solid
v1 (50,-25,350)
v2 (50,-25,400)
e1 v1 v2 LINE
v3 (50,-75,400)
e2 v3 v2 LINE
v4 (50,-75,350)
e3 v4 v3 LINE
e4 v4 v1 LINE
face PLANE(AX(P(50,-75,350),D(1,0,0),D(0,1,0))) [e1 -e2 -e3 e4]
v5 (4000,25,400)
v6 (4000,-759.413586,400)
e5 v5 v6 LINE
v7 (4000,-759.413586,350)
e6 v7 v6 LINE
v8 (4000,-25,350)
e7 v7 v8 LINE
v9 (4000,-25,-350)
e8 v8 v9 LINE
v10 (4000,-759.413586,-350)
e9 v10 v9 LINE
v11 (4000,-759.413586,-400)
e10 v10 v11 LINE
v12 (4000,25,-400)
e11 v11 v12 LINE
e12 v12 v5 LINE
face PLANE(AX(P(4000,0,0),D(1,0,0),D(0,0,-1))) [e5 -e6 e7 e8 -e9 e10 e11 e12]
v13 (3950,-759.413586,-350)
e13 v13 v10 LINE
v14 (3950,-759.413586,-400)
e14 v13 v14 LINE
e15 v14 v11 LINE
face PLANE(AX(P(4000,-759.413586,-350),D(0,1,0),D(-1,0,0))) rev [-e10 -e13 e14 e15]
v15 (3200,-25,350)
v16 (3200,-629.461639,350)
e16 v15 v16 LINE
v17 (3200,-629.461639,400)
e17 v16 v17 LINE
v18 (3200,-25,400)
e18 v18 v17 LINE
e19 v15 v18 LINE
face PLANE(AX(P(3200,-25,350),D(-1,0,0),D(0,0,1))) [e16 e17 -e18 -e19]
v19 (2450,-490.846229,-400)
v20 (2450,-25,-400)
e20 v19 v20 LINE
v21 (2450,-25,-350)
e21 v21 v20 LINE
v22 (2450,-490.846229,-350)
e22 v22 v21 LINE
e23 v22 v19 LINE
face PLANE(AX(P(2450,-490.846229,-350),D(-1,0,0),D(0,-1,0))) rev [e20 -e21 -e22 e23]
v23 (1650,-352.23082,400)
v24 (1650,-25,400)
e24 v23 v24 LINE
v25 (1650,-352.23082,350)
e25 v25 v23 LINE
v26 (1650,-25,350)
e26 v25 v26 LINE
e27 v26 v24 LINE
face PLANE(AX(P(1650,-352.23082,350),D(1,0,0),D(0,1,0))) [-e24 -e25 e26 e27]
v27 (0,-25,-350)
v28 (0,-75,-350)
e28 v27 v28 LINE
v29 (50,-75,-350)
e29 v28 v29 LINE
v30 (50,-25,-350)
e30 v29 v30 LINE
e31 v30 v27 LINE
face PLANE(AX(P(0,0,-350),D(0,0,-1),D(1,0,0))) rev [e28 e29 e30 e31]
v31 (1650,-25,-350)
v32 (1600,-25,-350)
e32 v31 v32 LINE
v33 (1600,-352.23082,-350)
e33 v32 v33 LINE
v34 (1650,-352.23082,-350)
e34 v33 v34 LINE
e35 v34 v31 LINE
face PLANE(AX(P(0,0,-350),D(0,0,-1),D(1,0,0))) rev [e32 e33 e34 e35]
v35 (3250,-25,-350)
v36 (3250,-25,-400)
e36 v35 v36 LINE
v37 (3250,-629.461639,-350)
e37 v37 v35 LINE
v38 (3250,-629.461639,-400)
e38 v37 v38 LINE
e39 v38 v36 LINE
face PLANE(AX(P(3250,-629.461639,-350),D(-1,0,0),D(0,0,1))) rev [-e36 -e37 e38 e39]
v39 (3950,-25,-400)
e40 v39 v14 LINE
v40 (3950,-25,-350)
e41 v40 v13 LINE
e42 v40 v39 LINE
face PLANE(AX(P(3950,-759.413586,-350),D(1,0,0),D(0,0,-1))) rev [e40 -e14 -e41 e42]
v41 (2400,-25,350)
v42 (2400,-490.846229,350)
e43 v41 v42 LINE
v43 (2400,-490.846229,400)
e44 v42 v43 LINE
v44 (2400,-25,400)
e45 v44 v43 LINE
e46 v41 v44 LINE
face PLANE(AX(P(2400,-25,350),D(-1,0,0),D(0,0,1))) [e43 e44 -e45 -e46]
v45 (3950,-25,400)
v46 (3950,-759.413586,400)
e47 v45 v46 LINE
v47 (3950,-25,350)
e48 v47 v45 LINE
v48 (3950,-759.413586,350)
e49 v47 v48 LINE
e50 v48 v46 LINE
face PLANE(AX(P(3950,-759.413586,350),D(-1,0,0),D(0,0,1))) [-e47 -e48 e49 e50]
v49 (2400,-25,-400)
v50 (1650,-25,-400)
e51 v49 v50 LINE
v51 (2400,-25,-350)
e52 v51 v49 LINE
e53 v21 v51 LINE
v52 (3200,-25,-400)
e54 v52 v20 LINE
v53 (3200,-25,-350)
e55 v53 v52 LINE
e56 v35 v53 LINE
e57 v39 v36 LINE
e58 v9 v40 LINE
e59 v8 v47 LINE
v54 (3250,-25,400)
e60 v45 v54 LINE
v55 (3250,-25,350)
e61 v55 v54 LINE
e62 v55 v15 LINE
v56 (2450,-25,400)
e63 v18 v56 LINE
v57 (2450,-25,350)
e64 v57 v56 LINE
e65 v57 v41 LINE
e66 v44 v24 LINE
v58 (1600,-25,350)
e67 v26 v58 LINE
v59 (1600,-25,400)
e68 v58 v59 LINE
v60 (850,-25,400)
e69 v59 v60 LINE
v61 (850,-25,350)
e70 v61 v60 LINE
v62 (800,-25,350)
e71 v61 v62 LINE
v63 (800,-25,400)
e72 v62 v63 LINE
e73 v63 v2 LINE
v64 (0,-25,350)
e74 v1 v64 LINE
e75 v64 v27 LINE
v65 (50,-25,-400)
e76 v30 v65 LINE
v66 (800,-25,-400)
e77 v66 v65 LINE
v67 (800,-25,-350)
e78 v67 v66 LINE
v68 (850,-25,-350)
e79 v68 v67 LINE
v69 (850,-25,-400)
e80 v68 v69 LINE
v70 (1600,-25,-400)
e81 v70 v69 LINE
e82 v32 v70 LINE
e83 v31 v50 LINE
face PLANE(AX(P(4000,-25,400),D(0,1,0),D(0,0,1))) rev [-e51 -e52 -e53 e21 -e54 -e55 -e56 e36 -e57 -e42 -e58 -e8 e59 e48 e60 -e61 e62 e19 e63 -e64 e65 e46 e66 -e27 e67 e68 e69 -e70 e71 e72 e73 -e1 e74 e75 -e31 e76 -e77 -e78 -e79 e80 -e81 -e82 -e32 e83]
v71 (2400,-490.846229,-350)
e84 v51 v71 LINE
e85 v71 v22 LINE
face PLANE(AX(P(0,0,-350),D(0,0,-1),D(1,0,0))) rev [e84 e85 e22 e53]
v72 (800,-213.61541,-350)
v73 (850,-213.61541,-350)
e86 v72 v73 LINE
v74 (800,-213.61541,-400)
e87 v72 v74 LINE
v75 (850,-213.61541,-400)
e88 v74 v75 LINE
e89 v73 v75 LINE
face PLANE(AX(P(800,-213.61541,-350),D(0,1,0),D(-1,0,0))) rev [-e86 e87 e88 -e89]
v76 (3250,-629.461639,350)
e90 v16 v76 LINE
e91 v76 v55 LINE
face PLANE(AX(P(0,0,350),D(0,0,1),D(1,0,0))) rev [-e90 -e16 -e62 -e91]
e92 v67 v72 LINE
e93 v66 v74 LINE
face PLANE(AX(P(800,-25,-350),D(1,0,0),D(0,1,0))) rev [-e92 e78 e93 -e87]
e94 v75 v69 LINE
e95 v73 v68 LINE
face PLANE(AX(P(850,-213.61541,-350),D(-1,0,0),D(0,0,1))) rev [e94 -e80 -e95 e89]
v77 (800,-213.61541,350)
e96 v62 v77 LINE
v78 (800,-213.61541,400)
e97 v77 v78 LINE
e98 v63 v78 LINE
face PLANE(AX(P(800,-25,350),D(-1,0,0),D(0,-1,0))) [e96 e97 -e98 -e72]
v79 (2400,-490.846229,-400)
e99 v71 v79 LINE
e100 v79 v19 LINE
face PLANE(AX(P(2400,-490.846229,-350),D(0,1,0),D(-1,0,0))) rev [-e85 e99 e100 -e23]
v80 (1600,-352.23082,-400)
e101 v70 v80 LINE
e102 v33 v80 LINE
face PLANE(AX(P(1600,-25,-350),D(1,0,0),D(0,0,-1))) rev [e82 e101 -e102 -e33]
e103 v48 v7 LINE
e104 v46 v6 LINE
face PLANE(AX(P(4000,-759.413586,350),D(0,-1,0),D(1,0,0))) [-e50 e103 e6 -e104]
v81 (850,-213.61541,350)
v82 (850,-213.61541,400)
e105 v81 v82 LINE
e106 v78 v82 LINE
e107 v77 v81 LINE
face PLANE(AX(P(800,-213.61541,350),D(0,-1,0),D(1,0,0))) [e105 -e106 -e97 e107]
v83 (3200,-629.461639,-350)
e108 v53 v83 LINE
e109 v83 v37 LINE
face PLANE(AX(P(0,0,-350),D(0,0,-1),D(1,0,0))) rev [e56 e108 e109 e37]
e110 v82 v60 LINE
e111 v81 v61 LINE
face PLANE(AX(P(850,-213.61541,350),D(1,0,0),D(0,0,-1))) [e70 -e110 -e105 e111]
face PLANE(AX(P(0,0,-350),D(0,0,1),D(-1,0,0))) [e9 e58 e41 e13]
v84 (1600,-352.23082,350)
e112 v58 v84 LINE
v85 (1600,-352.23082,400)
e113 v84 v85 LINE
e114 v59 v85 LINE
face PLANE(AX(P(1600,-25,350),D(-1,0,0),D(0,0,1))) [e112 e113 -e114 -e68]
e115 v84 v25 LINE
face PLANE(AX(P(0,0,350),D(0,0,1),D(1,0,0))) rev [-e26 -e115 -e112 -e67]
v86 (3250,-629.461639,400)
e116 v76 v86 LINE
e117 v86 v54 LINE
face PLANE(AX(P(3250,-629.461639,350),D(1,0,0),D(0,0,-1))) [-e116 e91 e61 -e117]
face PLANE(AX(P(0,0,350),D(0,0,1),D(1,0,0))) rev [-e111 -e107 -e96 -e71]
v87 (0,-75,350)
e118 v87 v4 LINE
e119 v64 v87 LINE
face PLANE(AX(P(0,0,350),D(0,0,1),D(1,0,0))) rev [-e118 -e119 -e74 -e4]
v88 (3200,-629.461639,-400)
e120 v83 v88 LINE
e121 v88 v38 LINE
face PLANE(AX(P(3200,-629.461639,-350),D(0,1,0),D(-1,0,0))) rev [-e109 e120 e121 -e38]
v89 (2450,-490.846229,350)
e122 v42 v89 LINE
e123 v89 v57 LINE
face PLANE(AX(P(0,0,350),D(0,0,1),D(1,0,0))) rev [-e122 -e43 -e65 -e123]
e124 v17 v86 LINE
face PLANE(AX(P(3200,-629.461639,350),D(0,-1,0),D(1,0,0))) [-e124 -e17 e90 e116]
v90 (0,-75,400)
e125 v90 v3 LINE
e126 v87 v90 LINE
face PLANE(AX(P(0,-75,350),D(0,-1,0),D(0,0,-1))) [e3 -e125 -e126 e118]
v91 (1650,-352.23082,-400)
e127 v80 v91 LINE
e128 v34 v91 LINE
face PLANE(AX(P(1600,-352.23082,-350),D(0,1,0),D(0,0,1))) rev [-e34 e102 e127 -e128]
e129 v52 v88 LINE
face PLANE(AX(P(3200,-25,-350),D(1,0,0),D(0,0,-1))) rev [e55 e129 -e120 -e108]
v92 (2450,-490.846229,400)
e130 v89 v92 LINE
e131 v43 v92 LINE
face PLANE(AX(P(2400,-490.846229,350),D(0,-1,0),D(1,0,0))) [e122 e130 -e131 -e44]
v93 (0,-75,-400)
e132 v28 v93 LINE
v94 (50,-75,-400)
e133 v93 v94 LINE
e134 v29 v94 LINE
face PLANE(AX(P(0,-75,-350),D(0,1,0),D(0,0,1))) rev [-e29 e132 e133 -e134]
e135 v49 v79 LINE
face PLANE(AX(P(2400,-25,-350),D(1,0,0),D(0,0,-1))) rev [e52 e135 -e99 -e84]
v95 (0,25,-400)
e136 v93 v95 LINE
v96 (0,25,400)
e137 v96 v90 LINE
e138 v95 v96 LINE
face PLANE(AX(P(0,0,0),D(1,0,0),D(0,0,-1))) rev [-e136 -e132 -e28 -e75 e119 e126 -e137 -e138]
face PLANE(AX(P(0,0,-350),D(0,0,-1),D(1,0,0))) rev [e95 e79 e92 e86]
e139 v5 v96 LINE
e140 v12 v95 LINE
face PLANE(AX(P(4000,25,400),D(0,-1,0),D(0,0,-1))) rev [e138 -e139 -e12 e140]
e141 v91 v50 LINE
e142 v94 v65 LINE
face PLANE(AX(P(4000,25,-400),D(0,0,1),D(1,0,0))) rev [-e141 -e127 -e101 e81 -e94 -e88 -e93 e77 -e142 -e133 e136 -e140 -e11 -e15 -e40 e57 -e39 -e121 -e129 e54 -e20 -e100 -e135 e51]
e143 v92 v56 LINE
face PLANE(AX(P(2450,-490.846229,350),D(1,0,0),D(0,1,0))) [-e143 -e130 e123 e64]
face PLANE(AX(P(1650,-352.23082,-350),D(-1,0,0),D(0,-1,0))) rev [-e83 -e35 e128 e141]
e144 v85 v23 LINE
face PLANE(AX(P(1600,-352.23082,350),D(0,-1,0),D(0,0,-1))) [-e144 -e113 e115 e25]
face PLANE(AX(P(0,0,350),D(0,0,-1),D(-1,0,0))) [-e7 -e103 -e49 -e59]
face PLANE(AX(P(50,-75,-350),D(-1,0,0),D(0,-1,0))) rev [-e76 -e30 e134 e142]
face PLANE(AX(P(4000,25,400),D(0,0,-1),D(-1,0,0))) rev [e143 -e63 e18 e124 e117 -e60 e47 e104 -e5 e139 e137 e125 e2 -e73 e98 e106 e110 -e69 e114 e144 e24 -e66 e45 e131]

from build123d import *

# Parameters (mm, degrees)
ESBO_O1_W                      = 800
ESBO_O1_H                      = 50
RESSALTO_EXTRUS_O1_DEPTH       = 4000
RESSALTO_EXTRUS_O2_START       = 350
RESSALTO_EXTRUS_O2_OUTLINE_W   = 50
RESSALTO_EXTRUS_O2_OUTLINE_H   = 734.413585936
RESSALTO_EXTRUS_O2_OUTLINE_H_2 = 50
RESSALTO_EXTRUS_O2_OUTLINE_H_3 = 188.61540981
RESSALTO_EXTRUS_O2_OUTLINE_H_4 = 327.23081962
RESSALTO_EXTRUS_O2_OUTLINE_H_5 = 465.84622943
RESSALTO_EXTRUS_O2_OUTLINE_H_6 = 604.461639239
RESSALTO_EXTRUS_O2_DEPTH       = 50


# Read off the part's stored shape, not the designer's step: Ressalto-extrusão2
with BuildPart() as part:
    # Esboço1 → Ressalto-extrusão1 (new body)
    with BuildSketch(Plane(origin=(0, 0, 0), x_dir=(0, 0, -1), z_dir=(1, 0, 0))):
        Rectangle(ESBO_O1_W, ESBO_O1_H)
    extrude(amount=RESSALTO_EXTRUS_O1_DEPTH)

    # Ressalto-extrusão2 outline → Ressalto-extrusão2 (add)
    with BuildSketch(Plane.XY.offset(RESSALTO_EXTRUS_O2_START)):
        with Locations((3975, -392.206792968)):
            Rectangle(RESSALTO_EXTRUS_O2_OUTLINE_W, RESSALTO_EXTRUS_O2_OUTLINE_H)
        with Locations((25, -50)):
            Rectangle(RESSALTO_EXTRUS_O2_OUTLINE_W, RESSALTO_EXTRUS_O2_OUTLINE_H_2)
        with Locations((825, -119.307704905)):
            Rectangle(RESSALTO_EXTRUS_O2_OUTLINE_W, RESSALTO_EXTRUS_O2_OUTLINE_H_3)
        with Locations((1625, -188.61540981)):
            Rectangle(RESSALTO_EXTRUS_O2_OUTLINE_W, RESSALTO_EXTRUS_O2_OUTLINE_H_4)
        with Locations((2425, -257.923114715)):
            Rectangle(RESSALTO_EXTRUS_O2_OUTLINE_W, RESSALTO_EXTRUS_O2_OUTLINE_H_5)
        with Locations((3225, -327.23081962)):
            Rectangle(RESSALTO_EXTRUS_O2_OUTLINE_W, RESSALTO_EXTRUS_O2_OUTLINE_H_6)
    ressalto_extrus_o2 = extrude(amount=RESSALTO_EXTRUS_O2_DEPTH)

    # Espelhar1: Ressalto-extrusão2 across plane
    add(ressalto_extrus_o2.mirror(Plane.XY))


solid = part.part
